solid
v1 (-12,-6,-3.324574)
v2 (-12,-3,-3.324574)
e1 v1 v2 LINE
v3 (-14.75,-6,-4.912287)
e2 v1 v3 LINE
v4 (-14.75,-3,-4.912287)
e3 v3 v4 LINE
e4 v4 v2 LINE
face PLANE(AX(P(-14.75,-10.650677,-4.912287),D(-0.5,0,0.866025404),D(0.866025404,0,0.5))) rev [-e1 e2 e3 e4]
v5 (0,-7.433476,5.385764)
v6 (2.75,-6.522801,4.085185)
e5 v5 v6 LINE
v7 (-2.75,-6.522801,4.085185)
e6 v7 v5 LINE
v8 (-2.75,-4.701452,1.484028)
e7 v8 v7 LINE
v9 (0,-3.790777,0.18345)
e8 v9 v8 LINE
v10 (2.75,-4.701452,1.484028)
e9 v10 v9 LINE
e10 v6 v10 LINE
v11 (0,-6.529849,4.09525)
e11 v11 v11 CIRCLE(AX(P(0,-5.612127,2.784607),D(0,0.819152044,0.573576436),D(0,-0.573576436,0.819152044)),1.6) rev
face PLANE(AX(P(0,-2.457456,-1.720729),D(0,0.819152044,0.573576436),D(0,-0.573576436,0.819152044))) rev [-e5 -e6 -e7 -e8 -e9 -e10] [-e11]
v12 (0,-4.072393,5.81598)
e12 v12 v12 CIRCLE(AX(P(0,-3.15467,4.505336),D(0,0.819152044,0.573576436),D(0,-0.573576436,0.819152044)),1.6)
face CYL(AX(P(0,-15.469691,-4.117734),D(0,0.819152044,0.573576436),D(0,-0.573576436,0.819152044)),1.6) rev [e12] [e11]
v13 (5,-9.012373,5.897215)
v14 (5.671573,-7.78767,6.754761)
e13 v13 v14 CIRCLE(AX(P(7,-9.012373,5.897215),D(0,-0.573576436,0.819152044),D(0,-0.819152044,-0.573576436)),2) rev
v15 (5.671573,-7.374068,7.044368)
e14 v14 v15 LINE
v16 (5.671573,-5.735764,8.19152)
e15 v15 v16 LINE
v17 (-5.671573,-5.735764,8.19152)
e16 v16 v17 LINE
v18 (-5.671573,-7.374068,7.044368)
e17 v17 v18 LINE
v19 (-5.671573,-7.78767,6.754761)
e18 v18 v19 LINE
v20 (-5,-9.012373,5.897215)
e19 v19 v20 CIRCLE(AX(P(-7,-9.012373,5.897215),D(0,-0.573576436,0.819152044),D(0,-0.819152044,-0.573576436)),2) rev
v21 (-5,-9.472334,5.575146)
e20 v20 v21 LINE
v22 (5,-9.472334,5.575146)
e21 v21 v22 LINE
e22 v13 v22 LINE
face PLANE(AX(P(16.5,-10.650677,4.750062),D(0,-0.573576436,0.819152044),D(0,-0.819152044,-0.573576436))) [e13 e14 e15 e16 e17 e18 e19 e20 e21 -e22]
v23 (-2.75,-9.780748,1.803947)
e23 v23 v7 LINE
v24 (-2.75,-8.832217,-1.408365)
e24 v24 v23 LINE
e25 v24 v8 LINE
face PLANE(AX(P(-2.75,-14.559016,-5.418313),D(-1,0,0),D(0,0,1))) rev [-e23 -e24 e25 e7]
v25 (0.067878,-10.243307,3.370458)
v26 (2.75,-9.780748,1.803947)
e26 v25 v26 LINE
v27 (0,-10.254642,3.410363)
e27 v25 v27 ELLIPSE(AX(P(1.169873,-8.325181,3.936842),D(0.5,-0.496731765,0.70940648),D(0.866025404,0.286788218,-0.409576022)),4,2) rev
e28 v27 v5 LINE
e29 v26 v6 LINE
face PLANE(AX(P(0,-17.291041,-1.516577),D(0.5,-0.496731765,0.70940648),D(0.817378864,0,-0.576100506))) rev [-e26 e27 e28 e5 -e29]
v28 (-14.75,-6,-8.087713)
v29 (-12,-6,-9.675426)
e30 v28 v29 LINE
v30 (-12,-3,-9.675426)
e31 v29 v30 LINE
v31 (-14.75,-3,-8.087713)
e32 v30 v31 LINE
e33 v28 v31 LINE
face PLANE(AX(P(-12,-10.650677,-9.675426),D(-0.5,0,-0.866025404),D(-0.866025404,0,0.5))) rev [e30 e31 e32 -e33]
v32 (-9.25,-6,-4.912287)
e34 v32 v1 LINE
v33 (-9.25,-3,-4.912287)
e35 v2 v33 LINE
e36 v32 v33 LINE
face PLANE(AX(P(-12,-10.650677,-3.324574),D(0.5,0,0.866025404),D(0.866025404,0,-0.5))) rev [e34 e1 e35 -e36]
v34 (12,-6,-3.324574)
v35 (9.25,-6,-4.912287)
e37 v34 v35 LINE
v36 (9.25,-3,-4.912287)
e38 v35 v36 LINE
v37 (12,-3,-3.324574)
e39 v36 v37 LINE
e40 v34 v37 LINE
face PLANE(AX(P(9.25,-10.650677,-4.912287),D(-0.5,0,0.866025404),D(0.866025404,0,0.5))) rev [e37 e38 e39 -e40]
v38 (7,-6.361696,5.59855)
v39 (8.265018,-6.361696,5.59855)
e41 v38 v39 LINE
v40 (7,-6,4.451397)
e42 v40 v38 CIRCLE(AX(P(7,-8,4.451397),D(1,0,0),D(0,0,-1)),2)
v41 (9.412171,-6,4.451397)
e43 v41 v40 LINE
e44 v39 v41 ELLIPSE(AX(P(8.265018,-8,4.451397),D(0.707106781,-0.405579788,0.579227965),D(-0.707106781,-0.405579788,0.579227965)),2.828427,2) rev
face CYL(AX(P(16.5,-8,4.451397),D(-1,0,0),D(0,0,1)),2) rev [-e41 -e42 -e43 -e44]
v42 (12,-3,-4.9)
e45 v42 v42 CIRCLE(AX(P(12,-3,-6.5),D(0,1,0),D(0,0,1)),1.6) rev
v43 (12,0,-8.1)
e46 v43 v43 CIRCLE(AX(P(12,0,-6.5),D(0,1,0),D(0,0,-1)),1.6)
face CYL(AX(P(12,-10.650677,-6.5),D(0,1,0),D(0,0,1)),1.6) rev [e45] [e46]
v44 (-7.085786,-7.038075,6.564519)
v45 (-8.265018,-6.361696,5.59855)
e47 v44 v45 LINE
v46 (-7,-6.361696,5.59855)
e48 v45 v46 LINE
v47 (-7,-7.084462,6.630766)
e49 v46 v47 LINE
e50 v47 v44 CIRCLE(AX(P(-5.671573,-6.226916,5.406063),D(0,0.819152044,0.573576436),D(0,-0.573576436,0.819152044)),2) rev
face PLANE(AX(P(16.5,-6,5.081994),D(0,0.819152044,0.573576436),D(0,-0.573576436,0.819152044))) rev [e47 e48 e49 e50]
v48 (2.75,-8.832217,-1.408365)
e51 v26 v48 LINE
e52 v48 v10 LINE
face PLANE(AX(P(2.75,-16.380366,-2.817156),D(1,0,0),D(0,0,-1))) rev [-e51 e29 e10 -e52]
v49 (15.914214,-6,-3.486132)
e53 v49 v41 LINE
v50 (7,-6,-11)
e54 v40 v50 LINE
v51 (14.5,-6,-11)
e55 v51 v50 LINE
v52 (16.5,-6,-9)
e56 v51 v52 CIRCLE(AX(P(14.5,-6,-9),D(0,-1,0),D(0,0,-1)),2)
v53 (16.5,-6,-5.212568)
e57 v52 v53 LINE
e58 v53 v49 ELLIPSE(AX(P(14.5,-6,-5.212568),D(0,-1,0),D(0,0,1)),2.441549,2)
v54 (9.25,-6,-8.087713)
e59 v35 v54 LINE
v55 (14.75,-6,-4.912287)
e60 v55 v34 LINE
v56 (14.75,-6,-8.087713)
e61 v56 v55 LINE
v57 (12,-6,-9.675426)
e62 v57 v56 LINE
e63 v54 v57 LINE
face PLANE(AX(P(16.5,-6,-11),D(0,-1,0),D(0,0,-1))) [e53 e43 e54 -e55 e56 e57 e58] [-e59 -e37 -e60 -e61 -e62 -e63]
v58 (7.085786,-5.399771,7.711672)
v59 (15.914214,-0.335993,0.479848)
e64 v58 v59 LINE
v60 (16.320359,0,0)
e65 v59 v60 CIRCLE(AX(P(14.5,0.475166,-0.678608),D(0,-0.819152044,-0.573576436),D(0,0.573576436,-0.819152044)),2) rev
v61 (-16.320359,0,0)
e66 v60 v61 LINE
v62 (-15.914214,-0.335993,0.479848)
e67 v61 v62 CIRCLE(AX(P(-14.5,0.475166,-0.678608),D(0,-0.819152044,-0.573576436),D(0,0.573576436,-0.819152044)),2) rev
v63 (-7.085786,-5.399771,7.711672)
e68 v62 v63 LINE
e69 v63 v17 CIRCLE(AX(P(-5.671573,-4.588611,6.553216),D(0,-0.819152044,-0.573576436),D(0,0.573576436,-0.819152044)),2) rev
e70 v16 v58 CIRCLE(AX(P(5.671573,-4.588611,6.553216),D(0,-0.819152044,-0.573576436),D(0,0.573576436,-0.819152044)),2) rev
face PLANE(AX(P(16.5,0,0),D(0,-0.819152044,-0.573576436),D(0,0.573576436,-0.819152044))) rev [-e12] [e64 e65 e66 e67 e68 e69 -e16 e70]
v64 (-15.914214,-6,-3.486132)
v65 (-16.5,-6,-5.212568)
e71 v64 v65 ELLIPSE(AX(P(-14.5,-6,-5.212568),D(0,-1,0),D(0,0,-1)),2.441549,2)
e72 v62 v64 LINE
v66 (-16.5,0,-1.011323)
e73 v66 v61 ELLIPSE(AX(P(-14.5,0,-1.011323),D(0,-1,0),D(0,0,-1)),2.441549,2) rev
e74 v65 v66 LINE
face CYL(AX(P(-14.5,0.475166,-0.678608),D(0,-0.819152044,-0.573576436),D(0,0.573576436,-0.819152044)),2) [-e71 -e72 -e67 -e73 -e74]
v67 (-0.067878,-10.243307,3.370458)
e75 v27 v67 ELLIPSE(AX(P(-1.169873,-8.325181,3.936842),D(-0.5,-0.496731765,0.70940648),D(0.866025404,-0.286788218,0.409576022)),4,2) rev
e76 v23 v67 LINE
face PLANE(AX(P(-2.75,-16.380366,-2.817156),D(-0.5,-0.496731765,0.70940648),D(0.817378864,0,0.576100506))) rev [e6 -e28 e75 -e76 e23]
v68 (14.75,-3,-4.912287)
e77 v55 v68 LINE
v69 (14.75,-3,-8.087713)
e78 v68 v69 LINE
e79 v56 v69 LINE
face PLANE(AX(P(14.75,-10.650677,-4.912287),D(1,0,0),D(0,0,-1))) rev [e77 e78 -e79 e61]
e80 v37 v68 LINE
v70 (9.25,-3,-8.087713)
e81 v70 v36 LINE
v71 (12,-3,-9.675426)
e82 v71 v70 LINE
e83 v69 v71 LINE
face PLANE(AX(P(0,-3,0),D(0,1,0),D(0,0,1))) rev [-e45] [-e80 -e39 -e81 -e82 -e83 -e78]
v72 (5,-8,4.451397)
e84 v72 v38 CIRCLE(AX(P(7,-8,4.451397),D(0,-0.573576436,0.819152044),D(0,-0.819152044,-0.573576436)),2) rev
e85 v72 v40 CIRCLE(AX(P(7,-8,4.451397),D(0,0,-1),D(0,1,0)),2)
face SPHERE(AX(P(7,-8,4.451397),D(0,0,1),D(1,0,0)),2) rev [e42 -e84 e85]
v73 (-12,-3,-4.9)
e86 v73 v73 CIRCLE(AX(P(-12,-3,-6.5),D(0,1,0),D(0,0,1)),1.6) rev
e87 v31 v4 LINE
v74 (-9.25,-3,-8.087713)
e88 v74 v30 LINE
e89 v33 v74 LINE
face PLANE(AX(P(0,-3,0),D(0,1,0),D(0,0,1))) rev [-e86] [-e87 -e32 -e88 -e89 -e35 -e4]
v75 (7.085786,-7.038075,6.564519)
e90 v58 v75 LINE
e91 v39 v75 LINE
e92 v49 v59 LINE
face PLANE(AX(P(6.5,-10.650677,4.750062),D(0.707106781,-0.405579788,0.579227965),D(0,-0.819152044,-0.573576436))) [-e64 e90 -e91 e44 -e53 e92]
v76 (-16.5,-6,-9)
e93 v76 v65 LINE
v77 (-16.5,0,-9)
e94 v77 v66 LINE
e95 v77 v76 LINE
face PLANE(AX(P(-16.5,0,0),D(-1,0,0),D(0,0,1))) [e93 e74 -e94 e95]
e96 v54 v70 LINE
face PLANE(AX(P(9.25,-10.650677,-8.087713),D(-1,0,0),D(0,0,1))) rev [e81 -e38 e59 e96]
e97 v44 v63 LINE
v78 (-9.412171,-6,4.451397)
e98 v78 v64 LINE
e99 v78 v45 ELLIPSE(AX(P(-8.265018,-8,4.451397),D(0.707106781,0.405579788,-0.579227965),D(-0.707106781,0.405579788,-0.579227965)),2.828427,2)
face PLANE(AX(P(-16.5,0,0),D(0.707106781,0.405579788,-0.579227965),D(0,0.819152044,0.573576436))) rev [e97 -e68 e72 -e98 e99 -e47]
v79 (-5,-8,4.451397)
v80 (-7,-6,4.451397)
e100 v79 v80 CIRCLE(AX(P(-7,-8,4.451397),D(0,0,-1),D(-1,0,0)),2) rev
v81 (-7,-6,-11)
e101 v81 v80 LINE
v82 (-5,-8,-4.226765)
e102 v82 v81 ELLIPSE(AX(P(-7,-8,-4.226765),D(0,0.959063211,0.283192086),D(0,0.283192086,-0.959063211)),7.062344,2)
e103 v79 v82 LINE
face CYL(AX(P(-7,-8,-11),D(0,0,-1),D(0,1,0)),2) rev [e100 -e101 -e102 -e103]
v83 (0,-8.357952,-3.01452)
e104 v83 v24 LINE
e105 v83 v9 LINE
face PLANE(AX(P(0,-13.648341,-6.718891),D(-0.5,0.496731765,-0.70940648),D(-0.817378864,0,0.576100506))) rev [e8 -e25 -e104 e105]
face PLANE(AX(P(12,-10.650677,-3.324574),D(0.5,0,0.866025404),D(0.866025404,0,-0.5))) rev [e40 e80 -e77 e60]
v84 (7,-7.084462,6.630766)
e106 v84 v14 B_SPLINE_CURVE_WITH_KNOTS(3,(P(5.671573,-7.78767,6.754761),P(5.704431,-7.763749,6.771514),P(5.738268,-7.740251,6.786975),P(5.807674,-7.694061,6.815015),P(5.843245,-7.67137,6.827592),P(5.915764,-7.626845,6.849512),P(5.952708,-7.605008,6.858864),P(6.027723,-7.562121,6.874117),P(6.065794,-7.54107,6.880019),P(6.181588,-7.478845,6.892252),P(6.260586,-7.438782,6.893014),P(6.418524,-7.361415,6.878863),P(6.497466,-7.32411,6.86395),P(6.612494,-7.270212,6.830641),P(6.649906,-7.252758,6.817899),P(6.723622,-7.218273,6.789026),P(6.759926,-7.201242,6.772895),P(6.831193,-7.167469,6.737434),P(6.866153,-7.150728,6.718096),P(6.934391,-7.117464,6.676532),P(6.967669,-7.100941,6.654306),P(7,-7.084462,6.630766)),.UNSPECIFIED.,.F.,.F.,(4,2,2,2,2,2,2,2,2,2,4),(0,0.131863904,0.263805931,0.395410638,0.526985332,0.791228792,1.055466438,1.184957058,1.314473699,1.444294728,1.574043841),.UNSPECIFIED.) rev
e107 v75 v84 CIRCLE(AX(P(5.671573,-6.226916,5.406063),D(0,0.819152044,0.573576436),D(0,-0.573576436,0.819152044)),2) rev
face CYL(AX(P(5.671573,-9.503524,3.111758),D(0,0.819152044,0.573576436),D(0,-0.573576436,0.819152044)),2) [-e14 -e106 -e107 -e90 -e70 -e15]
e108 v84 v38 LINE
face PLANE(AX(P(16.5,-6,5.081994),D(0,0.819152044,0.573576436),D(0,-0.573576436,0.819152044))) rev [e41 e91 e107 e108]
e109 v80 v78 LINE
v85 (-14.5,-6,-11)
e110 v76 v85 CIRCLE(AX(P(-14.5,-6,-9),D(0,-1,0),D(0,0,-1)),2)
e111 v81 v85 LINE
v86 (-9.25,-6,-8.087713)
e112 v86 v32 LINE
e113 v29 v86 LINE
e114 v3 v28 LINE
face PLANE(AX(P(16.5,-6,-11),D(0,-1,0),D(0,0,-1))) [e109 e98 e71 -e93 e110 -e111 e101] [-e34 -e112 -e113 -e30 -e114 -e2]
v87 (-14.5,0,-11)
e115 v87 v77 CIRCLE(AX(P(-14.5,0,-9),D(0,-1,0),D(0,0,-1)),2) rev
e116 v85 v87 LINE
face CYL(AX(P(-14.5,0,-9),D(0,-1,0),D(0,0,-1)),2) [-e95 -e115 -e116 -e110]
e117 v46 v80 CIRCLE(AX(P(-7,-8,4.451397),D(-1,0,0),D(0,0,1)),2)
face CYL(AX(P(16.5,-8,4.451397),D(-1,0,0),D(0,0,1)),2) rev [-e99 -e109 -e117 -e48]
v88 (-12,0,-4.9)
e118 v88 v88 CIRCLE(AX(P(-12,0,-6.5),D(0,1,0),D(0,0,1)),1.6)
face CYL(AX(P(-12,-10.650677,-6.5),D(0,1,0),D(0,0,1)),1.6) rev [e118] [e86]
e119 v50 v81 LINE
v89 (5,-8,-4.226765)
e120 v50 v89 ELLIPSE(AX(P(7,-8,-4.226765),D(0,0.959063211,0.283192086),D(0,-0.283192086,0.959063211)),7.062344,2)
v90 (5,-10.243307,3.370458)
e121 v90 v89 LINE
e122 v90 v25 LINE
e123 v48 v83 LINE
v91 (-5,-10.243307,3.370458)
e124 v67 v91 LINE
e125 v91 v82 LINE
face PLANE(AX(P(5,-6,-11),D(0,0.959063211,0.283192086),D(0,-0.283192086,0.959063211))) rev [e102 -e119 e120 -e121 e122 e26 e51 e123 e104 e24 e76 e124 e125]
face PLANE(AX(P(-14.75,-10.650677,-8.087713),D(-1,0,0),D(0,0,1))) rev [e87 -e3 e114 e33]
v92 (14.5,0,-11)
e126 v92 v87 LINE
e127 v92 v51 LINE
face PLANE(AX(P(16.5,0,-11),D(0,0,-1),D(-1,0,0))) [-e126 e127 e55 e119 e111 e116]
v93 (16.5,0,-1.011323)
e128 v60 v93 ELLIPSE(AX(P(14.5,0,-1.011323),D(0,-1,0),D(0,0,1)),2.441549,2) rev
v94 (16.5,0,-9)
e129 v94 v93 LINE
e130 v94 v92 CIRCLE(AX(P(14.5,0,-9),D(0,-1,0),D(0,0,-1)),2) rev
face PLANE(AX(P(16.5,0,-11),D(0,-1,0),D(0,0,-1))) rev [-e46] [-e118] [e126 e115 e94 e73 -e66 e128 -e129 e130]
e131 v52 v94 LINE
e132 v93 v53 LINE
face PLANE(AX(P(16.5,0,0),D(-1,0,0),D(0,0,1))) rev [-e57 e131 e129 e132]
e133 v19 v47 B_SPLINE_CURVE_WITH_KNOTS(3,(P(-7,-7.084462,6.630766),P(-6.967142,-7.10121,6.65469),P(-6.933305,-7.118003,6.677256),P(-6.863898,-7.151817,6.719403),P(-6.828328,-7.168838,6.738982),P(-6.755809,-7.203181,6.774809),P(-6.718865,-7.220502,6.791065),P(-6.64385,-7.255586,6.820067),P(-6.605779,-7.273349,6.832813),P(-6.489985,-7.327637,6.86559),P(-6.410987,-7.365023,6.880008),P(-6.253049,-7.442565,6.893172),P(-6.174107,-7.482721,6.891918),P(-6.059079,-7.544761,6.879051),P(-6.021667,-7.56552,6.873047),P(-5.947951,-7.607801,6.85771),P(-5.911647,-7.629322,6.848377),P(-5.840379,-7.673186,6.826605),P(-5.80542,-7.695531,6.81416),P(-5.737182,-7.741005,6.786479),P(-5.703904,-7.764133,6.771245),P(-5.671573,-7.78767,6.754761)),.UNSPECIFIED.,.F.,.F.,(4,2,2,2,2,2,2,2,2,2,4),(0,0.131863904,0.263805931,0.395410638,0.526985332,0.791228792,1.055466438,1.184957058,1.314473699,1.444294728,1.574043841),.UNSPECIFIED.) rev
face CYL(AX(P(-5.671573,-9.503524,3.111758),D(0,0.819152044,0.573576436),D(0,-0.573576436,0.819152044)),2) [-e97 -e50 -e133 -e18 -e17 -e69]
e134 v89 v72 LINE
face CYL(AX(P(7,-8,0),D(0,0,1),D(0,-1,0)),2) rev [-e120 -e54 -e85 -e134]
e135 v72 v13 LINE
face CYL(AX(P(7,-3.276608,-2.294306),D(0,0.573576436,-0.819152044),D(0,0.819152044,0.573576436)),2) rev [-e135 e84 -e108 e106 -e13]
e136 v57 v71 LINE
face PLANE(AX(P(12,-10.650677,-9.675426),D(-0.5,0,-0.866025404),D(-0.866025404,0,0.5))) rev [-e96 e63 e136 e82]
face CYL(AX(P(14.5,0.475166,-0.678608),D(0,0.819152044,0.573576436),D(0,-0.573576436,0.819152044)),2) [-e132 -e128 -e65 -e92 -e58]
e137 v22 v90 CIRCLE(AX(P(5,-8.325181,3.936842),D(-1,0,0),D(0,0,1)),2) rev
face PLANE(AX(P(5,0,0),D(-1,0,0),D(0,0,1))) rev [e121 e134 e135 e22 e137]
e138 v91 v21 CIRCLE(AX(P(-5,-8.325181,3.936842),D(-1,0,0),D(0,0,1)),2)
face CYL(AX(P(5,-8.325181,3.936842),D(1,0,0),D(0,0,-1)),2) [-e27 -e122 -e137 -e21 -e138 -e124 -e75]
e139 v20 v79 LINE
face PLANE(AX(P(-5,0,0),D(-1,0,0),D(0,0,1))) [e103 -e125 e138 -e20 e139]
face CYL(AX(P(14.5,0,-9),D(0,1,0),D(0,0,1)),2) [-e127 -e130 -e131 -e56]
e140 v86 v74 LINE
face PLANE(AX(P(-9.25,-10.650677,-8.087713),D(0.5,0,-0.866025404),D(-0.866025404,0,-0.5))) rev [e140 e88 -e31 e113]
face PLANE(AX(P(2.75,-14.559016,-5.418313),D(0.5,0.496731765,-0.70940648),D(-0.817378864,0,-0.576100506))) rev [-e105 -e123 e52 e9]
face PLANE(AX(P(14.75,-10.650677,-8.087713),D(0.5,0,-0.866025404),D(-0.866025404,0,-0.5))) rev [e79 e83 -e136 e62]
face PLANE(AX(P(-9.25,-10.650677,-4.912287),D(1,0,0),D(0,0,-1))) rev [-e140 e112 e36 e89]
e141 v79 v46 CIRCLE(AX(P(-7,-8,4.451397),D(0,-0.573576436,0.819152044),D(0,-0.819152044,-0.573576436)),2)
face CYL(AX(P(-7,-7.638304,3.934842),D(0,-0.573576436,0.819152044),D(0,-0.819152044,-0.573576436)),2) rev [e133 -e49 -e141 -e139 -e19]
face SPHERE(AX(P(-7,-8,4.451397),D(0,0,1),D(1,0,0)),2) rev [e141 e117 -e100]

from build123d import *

# Parameters (mm, degrees)
EXTRU_MINCE1_DEPTH      = 16.5
ENL_V_MAT_EXTRU_5_DEPTH = 37.379072455
BOSS_EXTRU_1_DEPTH      = 5
ESQUISSE2_R             = 1.6
ENL_V_MAT_EXTRU_1_DEPTH = 23.509707076
ESQUISSE3_R             = 1.6
ENL_V_MAT_EXTRU_2_DEPTH = 23.509707076
ENL_V_START             = -3
ENL_V_MAT_EXTRU_3_DEPTH = 20.509707076
ENL_V_MAT_EXTRU_4_DEPTH = 20.509707076
CHANFREIN1_SIZE         = 10
CONG_1_R                = 2


with BuildPart() as part:
    # Esquisse1 → Extru.-Mince1 (new, symmetric)
    with BuildSketch(Plane(origin=(0, 0, 0), x_dir=(0, 0, -1), z_dir=(1, 0, 0))):
        Polygon((11, 0), (0, 0), (-8.191520443, -5.735764364), (-4.750061825, -10.650676629), (1.891792733, -6), (11, -6), align=None)
    extrude(amount=EXTRU_MINCE1_DEPTH, both=True)

    # Esquisse7 → Enlèv. mat.-Extru.5 (cut, through all)
    with BuildSketch(Plane.ZY.offset(16.5)):
        Polygon((-1.891792733, -6), (5.081994449, -6), (7.04436757, -7.374068452), (4.750061825, -10.650676629), align=None)
    extrude(amount=-ENL_V_MAT_EXTRU_5_DEPTH, mode=Mode.SUBTRACT)

    # Esquisse6 → Boss.-Extru.1 (add, symmetric)
    with BuildSketch(Plane(origin=(0, 0, 0), x_dir=(0, 0, -1), z_dir=(1, 0, 0))):
        Polygon((1.891792733, -6), (11, -6), (-4.750061825, -10.650676629), (-8.191520443, -5.735764364), (-5.081994449, -6), align=None)
    extrude(amount=BOSS_EXTRU_1_DEPTH, both=True)

    # Esquisse2 → Enlèv. mat.-Extru.1 (cut, through all)
    with BuildSketch(Plane(origin=(0, 0, 0), x_dir=(1, 0, 0), z_dir=(0, 1, 0))):
        with Locations(Location((-12, 6.5, 0), (0, 0, 270))):
            Circle(ESQUISSE2_R)
        with Locations(Location((12, 6.5, 0), (0, 0, 90))):
            Circle(ESQUISSE2_R)
    extrude(amount=-ENL_V_MAT_EXTRU_1_DEPTH, mode=Mode.SUBTRACT)

    # Esquisse3 → Enlèv. mat.-Extru.2 (cut, through all)
    with BuildSketch(Plane(origin=(0, 0, 0), x_dir=(1, 0, 0), z_dir=(0, 0.819152044288991, 0.5735764363510473))):
        with Locations(Location((0, -5.5, 0), (0, 0, 270))):
            Circle(ESQUISSE3_R)
    extrude(amount=-ENL_V_MAT_EXTRU_2_DEPTH, mode=Mode.SUBTRACT)

    # Esquisse4 → Enlèv. mat.-Extru.3 (cut, through all)
    with BuildSketch(Plane(origin=(0, 0, 0), x_dir=(1, 0, 0), z_dir=(0, 1, 0)).offset(ENL_V_START)):
        Polygon((-9.25, 8.08771324), (-12, 9.675426481), (-14.75, 8.08771324), (-14.75, 4.91228676), (-12, 3.324573519), (-9.25, 4.91228676), align=None)
        Polygon((14.75, 8.08771324), (12, 9.675426481), (9.25, 8.08771324), (9.25, 4.91228676), (12, 3.324573519), (14.75, 4.91228676), align=None)
    extrude(amount=-ENL_V_MAT_EXTRU_3_DEPTH, mode=Mode.SUBTRACT)

    # Esquisse5 → Enlèv. mat.-Extru.4 (cut, through all)
    with BuildSketch(Plane(origin=(0, 0, 0), x_dir=(1, 0, 0), z_dir=(0, 0.819152044288991, 0.5735764363510474)).offset(ENL_V_START)):
        Polygon((2.75, -3.91228676), (0, -2.324573519), (-2.75, -3.91228676), (-2.75, -7.08771324), (0, -8.675426481), (2.75, -7.08771324), align=None)
    extrude(amount=-ENL_V_MAT_EXTRU_4_DEPTH, mode=Mode.SUBTRACT)

    # Chanfrein1
    chanfrein1_edges = [part.edges().sort_by_distance(p)[0] for p in [
        (-16.5, -6.554916408, 7.617944007),
        (16.5, -6.554916408, 7.617944007),
    ]]
    chamfer(chanfrein1_edges, length=CHANFREIN1_SIZE)

    # Congé1
    # the kernel refuses this fillet: 2 mm, written as the material it adds along each edge
    with BuildSketch(Plane(origin=(7, -8, 4.451396871), x_dir=(0, 0.819152044288991, 0.5735764363510474), z_dir=(-1, 0, 0))) as cong_1_piece_1_section:
        Polygon((0, 0), (CONG_1_R, 0), (CONG_1_R, CONG_1_R * 0.315298788879), (CONG_1_R * 0.819152044289, CONG_1_R * 0.573576436351), align=None)
    cong_1_piece_1 = extrude(amount=CONG_1_R, mode=Mode.PRIVATE)
    cong_1_piece_1 = cong_1_piece_1 - Plane(origin=(7, -8, 4.451396871), x_dir=(0, -0.9537169507482266, -0.30070579950427384), z_dir=(-1, 0, 0)) * Sphere(CONG_1_R, mode=Mode.PRIVATE)
    add(cong_1_piece_1)
    with BuildSketch(Plane(origin=(-7, -8, 4.451396871), x_dir=(0, 1, 0), z_dir=(1, 0, 0))) as cong_1_piece_2_section:
        Polygon((0, 0), (CONG_1_R, 0), (CONG_1_R, CONG_1_R * 0.315298788879), (CONG_1_R * 0.819152044289, CONG_1_R * 0.573576436351), align=None)
    cong_1_piece_2 = extrude(amount=CONG_1_R, mode=Mode.PRIVATE)
    cong_1_piece_2 = cong_1_piece_2 - Plane(origin=(-7, -8, 4.451396871), x_dir=(0, -0.9537169507482266, -0.30070579950427384), z_dir=(1, 0, 0)) * Sphere(CONG_1_R, mode=Mode.PRIVATE)
    add(cong_1_piece_2)
    with BuildSketch(Plane(origin=(7, -6, 5.081994449), x_dir=(0, 0, -1), z_dir=(1, 0, 0))) as cong_1_piece_3_section:
        with BuildLine():
            CenterArc((CONG_1_R * 0.315298788879, -CONG_1_R), CONG_1_R, 90, 35)
            Line((-CONG_1_R * 0.258277647472, -CONG_1_R * 0.180847955711), (0, 0))
            Line((0, 0), (CONG_1_R * 0.315298788879, 0))
        make_face()
    cong_1_piece_3 = extrude(amount=3.472109184, mode=Mode.PRIVATE)
    cong_1_piece_3 = split(cong_1_piece_3, bisect_by=Plane(origin=(8.435798526, -6.333350621, 5.409912391), z_dir=(-0.7071067811865476, 0.40557978767263964, -0.5792279653395686)), keep=Keep.TOP, mode=Mode.PRIVATE)
    add(cong_1_piece_3)
    with BuildSketch(Plane(origin=(-10.472109184, -6, 5.081994449), x_dir=(0, 0, -1), z_dir=(1, 0, 0))) as cong_1_piece_4_section:
        with BuildLine():
            CenterArc((CONG_1_R * 0.315298788879, -CONG_1_R), CONG_1_R, 90, 35)
            Line((-CONG_1_R * 0.258277647472, -CONG_1_R * 0.180847955711), (0, 0))
            Line((0, 0), (CONG_1_R * 0.315298788879, 0))
        make_face()
    cong_1_piece_4 = extrude(amount=3.472109184, mode=Mode.PRIVATE)
    cong_1_piece_4 = split(cong_1_piece_4, bisect_by=Plane(origin=(-8.435798526, -6.333350621, 5.409912391), z_dir=(0.7071067811865476, 0.40557978767263964, -0.5792279653395686)), keep=Keep.TOP, mode=Mode.PRIVATE)
    add(cong_1_piece_4)
    with BuildSketch(Plane(origin=(-5, -7.374068452, 7.04436757), x_dir=(-1, 0, 0), z_dir=(0, 0.5735764363510474, -0.819152044288991))) as cong_1_piece_5_section:
        with BuildLine():
            CenterArc((CONG_1_R, -CONG_1_R), CONG_1_R, 90, 90)
            Line((0, -CONG_1_R), (0, 0))
            Line((0, 0), (CONG_1_R, 0))
        make_face()
    cong_1_piece_5 = extrude(amount=1.765017662, mode=Mode.PRIVATE)
    cong_1_piece_5 = split(cong_1_piece_5, bisect_by=Plane(origin=(-6.416553747, -7.794178032, 6.852072741), z_dir=(0.7071067811865476, 0.40557978767263964, -0.5792279653395686)), keep=Keep.TOP, mode=Mode.PRIVATE)
    add(cong_1_piece_5)
    with BuildSketch(Plane(origin=(5, -7.374068452, 7.04436757), x_dir=(1, 0, 0), z_dir=(0, 0.5735764363510474, -0.819152044288991))) as cong_1_piece_6_section:
        with BuildLine():
            CenterArc((CONG_1_R, CONG_1_R), CONG_1_R, 180, 90)
            Line((0, CONG_1_R), (0, 0))
            Line((0, 0), (CONG_1_R, 0))
        make_face()
    cong_1_piece_6 = extrude(amount=1.765017662, mode=Mode.PRIVATE)
    cong_1_piece_6 = split(cong_1_piece_6, bisect_by=Plane(origin=(6.416553747, -7.794178032, 6.852072741), z_dir=(-0.7071067811865476, 0.40557978767263964, -0.5792279653395686)), keep=Keep.TOP, mode=Mode.PRIVATE)
    add(cong_1_piece_6)
    with BuildSketch(Plane(origin=(5, -6, 4.451396871), x_dir=(1, 0, 0), z_dir=(0, 0, -1))) as cong_1_piece_7_section:
        with BuildLine():
            CenterArc((CONG_1_R, CONG_1_R), CONG_1_R, 180, 90)
            Line((0, CONG_1_R), (0, 0))
            Line((0, 0), (CONG_1_R, 0))
        make_face()
    cong_1_piece_7 = extrude(amount=15.451396871, mode=Mode.PRIVATE)
    cong_1_piece_7 = split(cong_1_piece_7, bisect_by=Plane(origin=(5.479319135, -8.319320936, -3.145347646), z_dir=(0, 0.9590632108966768, 0.2831920858791019)), keep=Keep.TOP, mode=Mode.PRIVATE)
    add(cong_1_piece_7)
    with BuildSketch(Plane(origin=(-5, -6, -11), x_dir=(-1, 0, 0), z_dir=(0, 0, 1))) as cong_1_piece_8_section:
        with BuildLine():
            CenterArc((CONG_1_R, CONG_1_R), CONG_1_R, 180, 90)
            Line((0, CONG_1_R), (0, 0))
            Line((0, 0), (CONG_1_R, 0))
        make_face()
    cong_1_piece_8 = extrude(amount=15.451396871, mode=Mode.PRIVATE)
    cong_1_piece_8 = split(cong_1_piece_8, bisect_by=Plane(origin=(-5.479319135, -8.319320936, -3.145347646), z_dir=(0, 0.9590632108966768, 0.2831920858791019)), keep=Keep.TOP, mode=Mode.PRIVATE)
    add(cong_1_piece_8)
    # the kernel refuses this fillet: 2 mm, written as the material it takes off along each edge
    with BuildSketch(Plane(origin=(-16.5, 1.696519432, 1.187915695), x_dir=(0, 0.5735764363510472, -0.8191520442889909), z_dir=(0, -0.819152044288991, -0.5735764363510473)), Plane(origin=(16.5, 1.696519432, 1.187915695), x_dir=(-0.7071067811865467, -0.40557978767264014, 0.5792279653395693), z_dir=(0, -0.819152044288991, -0.5735764363510473))) as cong_1_2_piece_1:
        with BuildLine():
            CenterArc((CONG_1_R * 0.414213562373, CONG_1_R), CONG_1_R, 225, 45)
            Line((-CONG_1_R * 0.292893218813, CONG_1_R * 0.292893218813), (0, 0))
            Line((0, 0), (CONG_1_R * 0.414213562373, 0))
        make_face()
    extrude(amount=11.466783156, mode=Mode.SUBTRACT)
    with BuildSketch(Plane(origin=(6.5, -9.12261086, 5.820024995), x_dir=(-1, 0, 0), z_dir=(0, 0.8191520442889916, 0.5735764363510465))) as cong_1_2_piece_2:
        with BuildLine():
            CenterArc((CONG_1_R * 0.414213562373, -CONG_1_R), CONG_1_R, 90, 45)
            Line((-CONG_1_R * 0.292893218813, -CONG_1_R * 0.292893218813), (0, 0))
            Line((0, 0), (CONG_1_R * 0.414213562373, 0))
        make_face()
    extrude(amount=6.205643951, mode=Mode.SUBTRACT)
    with BuildSketch(Plane(origin=(-6.5, -9.12261086, 5.820024995), x_dir=(1, 0, 0), z_dir=(-1.721686136418026e-15, 0.8191520442889914, 0.5735764363510468))) as cong_1_2_piece_3:
        with BuildLine():
            CenterArc((CONG_1_R * 0.414213562373, CONG_1_R), CONG_1_R, 225, 45)
            Line((-CONG_1_R * 0.292893218813, CONG_1_R * 0.292893218813), (0, 0))
            Line((0, 0), (CONG_1_R * 0.414213562373, 0))
        make_face()
    extrude(amount=6.205643951, mode=Mode.SUBTRACT)
    with BuildSketch(Plane(origin=(16.5, -11, -11), x_dir=(0, 0, 1), z_dir=(0, 1, 0))) as cong_1_2_piece_4:
        with BuildLine():
            CenterArc((CONG_1_R, -CONG_1_R), CONG_1_R, 90, 90)
            Line((0, -CONG_1_R), (0, 0))
            Line((0, 0), (CONG_1_R, 0))
        make_face()
    extrude(amount=16, mode=Mode.SUBTRACT)
    with BuildSketch(Plane(origin=(8.596227372, -10.650676629, 4.750061825), x_dir=(0, 0.2831920858791011, -0.9590632108966769), z_dir=(-1, 0, 0))) as cong_1_2_piece_5:
        with BuildLine():
            CenterArc((CONG_1_R * 0.719245474399, -CONG_1_R), CONG_1_R, 90, 71.450811124)
            Line((-CONG_1_R * 0.22880542283, -CONG_1_R * 0.681881317333), (0, 0))
            Line((0, 0), (CONG_1_R * 0.719245474399, 0))
        make_face()
    extrude(amount=17.192454744, mode=Mode.SUBTRACT)
    with BuildSketch(Plane(origin=(-16.5, -11, -11), x_dir=(0, 0, 1), z_dir=(0, 1, 0))) as cong_1_2_piece_6:
        with BuildLine():
            CenterArc((CONG_1_R, CONG_1_R), CONG_1_R, 180, 90)
            Line((0, CONG_1_R), (0, 0))
            Line((0, 0), (CONG_1_R, 0))
        make_face()
    extrude(amount=16, mode=Mode.SUBTRACT)


solid = part.part
